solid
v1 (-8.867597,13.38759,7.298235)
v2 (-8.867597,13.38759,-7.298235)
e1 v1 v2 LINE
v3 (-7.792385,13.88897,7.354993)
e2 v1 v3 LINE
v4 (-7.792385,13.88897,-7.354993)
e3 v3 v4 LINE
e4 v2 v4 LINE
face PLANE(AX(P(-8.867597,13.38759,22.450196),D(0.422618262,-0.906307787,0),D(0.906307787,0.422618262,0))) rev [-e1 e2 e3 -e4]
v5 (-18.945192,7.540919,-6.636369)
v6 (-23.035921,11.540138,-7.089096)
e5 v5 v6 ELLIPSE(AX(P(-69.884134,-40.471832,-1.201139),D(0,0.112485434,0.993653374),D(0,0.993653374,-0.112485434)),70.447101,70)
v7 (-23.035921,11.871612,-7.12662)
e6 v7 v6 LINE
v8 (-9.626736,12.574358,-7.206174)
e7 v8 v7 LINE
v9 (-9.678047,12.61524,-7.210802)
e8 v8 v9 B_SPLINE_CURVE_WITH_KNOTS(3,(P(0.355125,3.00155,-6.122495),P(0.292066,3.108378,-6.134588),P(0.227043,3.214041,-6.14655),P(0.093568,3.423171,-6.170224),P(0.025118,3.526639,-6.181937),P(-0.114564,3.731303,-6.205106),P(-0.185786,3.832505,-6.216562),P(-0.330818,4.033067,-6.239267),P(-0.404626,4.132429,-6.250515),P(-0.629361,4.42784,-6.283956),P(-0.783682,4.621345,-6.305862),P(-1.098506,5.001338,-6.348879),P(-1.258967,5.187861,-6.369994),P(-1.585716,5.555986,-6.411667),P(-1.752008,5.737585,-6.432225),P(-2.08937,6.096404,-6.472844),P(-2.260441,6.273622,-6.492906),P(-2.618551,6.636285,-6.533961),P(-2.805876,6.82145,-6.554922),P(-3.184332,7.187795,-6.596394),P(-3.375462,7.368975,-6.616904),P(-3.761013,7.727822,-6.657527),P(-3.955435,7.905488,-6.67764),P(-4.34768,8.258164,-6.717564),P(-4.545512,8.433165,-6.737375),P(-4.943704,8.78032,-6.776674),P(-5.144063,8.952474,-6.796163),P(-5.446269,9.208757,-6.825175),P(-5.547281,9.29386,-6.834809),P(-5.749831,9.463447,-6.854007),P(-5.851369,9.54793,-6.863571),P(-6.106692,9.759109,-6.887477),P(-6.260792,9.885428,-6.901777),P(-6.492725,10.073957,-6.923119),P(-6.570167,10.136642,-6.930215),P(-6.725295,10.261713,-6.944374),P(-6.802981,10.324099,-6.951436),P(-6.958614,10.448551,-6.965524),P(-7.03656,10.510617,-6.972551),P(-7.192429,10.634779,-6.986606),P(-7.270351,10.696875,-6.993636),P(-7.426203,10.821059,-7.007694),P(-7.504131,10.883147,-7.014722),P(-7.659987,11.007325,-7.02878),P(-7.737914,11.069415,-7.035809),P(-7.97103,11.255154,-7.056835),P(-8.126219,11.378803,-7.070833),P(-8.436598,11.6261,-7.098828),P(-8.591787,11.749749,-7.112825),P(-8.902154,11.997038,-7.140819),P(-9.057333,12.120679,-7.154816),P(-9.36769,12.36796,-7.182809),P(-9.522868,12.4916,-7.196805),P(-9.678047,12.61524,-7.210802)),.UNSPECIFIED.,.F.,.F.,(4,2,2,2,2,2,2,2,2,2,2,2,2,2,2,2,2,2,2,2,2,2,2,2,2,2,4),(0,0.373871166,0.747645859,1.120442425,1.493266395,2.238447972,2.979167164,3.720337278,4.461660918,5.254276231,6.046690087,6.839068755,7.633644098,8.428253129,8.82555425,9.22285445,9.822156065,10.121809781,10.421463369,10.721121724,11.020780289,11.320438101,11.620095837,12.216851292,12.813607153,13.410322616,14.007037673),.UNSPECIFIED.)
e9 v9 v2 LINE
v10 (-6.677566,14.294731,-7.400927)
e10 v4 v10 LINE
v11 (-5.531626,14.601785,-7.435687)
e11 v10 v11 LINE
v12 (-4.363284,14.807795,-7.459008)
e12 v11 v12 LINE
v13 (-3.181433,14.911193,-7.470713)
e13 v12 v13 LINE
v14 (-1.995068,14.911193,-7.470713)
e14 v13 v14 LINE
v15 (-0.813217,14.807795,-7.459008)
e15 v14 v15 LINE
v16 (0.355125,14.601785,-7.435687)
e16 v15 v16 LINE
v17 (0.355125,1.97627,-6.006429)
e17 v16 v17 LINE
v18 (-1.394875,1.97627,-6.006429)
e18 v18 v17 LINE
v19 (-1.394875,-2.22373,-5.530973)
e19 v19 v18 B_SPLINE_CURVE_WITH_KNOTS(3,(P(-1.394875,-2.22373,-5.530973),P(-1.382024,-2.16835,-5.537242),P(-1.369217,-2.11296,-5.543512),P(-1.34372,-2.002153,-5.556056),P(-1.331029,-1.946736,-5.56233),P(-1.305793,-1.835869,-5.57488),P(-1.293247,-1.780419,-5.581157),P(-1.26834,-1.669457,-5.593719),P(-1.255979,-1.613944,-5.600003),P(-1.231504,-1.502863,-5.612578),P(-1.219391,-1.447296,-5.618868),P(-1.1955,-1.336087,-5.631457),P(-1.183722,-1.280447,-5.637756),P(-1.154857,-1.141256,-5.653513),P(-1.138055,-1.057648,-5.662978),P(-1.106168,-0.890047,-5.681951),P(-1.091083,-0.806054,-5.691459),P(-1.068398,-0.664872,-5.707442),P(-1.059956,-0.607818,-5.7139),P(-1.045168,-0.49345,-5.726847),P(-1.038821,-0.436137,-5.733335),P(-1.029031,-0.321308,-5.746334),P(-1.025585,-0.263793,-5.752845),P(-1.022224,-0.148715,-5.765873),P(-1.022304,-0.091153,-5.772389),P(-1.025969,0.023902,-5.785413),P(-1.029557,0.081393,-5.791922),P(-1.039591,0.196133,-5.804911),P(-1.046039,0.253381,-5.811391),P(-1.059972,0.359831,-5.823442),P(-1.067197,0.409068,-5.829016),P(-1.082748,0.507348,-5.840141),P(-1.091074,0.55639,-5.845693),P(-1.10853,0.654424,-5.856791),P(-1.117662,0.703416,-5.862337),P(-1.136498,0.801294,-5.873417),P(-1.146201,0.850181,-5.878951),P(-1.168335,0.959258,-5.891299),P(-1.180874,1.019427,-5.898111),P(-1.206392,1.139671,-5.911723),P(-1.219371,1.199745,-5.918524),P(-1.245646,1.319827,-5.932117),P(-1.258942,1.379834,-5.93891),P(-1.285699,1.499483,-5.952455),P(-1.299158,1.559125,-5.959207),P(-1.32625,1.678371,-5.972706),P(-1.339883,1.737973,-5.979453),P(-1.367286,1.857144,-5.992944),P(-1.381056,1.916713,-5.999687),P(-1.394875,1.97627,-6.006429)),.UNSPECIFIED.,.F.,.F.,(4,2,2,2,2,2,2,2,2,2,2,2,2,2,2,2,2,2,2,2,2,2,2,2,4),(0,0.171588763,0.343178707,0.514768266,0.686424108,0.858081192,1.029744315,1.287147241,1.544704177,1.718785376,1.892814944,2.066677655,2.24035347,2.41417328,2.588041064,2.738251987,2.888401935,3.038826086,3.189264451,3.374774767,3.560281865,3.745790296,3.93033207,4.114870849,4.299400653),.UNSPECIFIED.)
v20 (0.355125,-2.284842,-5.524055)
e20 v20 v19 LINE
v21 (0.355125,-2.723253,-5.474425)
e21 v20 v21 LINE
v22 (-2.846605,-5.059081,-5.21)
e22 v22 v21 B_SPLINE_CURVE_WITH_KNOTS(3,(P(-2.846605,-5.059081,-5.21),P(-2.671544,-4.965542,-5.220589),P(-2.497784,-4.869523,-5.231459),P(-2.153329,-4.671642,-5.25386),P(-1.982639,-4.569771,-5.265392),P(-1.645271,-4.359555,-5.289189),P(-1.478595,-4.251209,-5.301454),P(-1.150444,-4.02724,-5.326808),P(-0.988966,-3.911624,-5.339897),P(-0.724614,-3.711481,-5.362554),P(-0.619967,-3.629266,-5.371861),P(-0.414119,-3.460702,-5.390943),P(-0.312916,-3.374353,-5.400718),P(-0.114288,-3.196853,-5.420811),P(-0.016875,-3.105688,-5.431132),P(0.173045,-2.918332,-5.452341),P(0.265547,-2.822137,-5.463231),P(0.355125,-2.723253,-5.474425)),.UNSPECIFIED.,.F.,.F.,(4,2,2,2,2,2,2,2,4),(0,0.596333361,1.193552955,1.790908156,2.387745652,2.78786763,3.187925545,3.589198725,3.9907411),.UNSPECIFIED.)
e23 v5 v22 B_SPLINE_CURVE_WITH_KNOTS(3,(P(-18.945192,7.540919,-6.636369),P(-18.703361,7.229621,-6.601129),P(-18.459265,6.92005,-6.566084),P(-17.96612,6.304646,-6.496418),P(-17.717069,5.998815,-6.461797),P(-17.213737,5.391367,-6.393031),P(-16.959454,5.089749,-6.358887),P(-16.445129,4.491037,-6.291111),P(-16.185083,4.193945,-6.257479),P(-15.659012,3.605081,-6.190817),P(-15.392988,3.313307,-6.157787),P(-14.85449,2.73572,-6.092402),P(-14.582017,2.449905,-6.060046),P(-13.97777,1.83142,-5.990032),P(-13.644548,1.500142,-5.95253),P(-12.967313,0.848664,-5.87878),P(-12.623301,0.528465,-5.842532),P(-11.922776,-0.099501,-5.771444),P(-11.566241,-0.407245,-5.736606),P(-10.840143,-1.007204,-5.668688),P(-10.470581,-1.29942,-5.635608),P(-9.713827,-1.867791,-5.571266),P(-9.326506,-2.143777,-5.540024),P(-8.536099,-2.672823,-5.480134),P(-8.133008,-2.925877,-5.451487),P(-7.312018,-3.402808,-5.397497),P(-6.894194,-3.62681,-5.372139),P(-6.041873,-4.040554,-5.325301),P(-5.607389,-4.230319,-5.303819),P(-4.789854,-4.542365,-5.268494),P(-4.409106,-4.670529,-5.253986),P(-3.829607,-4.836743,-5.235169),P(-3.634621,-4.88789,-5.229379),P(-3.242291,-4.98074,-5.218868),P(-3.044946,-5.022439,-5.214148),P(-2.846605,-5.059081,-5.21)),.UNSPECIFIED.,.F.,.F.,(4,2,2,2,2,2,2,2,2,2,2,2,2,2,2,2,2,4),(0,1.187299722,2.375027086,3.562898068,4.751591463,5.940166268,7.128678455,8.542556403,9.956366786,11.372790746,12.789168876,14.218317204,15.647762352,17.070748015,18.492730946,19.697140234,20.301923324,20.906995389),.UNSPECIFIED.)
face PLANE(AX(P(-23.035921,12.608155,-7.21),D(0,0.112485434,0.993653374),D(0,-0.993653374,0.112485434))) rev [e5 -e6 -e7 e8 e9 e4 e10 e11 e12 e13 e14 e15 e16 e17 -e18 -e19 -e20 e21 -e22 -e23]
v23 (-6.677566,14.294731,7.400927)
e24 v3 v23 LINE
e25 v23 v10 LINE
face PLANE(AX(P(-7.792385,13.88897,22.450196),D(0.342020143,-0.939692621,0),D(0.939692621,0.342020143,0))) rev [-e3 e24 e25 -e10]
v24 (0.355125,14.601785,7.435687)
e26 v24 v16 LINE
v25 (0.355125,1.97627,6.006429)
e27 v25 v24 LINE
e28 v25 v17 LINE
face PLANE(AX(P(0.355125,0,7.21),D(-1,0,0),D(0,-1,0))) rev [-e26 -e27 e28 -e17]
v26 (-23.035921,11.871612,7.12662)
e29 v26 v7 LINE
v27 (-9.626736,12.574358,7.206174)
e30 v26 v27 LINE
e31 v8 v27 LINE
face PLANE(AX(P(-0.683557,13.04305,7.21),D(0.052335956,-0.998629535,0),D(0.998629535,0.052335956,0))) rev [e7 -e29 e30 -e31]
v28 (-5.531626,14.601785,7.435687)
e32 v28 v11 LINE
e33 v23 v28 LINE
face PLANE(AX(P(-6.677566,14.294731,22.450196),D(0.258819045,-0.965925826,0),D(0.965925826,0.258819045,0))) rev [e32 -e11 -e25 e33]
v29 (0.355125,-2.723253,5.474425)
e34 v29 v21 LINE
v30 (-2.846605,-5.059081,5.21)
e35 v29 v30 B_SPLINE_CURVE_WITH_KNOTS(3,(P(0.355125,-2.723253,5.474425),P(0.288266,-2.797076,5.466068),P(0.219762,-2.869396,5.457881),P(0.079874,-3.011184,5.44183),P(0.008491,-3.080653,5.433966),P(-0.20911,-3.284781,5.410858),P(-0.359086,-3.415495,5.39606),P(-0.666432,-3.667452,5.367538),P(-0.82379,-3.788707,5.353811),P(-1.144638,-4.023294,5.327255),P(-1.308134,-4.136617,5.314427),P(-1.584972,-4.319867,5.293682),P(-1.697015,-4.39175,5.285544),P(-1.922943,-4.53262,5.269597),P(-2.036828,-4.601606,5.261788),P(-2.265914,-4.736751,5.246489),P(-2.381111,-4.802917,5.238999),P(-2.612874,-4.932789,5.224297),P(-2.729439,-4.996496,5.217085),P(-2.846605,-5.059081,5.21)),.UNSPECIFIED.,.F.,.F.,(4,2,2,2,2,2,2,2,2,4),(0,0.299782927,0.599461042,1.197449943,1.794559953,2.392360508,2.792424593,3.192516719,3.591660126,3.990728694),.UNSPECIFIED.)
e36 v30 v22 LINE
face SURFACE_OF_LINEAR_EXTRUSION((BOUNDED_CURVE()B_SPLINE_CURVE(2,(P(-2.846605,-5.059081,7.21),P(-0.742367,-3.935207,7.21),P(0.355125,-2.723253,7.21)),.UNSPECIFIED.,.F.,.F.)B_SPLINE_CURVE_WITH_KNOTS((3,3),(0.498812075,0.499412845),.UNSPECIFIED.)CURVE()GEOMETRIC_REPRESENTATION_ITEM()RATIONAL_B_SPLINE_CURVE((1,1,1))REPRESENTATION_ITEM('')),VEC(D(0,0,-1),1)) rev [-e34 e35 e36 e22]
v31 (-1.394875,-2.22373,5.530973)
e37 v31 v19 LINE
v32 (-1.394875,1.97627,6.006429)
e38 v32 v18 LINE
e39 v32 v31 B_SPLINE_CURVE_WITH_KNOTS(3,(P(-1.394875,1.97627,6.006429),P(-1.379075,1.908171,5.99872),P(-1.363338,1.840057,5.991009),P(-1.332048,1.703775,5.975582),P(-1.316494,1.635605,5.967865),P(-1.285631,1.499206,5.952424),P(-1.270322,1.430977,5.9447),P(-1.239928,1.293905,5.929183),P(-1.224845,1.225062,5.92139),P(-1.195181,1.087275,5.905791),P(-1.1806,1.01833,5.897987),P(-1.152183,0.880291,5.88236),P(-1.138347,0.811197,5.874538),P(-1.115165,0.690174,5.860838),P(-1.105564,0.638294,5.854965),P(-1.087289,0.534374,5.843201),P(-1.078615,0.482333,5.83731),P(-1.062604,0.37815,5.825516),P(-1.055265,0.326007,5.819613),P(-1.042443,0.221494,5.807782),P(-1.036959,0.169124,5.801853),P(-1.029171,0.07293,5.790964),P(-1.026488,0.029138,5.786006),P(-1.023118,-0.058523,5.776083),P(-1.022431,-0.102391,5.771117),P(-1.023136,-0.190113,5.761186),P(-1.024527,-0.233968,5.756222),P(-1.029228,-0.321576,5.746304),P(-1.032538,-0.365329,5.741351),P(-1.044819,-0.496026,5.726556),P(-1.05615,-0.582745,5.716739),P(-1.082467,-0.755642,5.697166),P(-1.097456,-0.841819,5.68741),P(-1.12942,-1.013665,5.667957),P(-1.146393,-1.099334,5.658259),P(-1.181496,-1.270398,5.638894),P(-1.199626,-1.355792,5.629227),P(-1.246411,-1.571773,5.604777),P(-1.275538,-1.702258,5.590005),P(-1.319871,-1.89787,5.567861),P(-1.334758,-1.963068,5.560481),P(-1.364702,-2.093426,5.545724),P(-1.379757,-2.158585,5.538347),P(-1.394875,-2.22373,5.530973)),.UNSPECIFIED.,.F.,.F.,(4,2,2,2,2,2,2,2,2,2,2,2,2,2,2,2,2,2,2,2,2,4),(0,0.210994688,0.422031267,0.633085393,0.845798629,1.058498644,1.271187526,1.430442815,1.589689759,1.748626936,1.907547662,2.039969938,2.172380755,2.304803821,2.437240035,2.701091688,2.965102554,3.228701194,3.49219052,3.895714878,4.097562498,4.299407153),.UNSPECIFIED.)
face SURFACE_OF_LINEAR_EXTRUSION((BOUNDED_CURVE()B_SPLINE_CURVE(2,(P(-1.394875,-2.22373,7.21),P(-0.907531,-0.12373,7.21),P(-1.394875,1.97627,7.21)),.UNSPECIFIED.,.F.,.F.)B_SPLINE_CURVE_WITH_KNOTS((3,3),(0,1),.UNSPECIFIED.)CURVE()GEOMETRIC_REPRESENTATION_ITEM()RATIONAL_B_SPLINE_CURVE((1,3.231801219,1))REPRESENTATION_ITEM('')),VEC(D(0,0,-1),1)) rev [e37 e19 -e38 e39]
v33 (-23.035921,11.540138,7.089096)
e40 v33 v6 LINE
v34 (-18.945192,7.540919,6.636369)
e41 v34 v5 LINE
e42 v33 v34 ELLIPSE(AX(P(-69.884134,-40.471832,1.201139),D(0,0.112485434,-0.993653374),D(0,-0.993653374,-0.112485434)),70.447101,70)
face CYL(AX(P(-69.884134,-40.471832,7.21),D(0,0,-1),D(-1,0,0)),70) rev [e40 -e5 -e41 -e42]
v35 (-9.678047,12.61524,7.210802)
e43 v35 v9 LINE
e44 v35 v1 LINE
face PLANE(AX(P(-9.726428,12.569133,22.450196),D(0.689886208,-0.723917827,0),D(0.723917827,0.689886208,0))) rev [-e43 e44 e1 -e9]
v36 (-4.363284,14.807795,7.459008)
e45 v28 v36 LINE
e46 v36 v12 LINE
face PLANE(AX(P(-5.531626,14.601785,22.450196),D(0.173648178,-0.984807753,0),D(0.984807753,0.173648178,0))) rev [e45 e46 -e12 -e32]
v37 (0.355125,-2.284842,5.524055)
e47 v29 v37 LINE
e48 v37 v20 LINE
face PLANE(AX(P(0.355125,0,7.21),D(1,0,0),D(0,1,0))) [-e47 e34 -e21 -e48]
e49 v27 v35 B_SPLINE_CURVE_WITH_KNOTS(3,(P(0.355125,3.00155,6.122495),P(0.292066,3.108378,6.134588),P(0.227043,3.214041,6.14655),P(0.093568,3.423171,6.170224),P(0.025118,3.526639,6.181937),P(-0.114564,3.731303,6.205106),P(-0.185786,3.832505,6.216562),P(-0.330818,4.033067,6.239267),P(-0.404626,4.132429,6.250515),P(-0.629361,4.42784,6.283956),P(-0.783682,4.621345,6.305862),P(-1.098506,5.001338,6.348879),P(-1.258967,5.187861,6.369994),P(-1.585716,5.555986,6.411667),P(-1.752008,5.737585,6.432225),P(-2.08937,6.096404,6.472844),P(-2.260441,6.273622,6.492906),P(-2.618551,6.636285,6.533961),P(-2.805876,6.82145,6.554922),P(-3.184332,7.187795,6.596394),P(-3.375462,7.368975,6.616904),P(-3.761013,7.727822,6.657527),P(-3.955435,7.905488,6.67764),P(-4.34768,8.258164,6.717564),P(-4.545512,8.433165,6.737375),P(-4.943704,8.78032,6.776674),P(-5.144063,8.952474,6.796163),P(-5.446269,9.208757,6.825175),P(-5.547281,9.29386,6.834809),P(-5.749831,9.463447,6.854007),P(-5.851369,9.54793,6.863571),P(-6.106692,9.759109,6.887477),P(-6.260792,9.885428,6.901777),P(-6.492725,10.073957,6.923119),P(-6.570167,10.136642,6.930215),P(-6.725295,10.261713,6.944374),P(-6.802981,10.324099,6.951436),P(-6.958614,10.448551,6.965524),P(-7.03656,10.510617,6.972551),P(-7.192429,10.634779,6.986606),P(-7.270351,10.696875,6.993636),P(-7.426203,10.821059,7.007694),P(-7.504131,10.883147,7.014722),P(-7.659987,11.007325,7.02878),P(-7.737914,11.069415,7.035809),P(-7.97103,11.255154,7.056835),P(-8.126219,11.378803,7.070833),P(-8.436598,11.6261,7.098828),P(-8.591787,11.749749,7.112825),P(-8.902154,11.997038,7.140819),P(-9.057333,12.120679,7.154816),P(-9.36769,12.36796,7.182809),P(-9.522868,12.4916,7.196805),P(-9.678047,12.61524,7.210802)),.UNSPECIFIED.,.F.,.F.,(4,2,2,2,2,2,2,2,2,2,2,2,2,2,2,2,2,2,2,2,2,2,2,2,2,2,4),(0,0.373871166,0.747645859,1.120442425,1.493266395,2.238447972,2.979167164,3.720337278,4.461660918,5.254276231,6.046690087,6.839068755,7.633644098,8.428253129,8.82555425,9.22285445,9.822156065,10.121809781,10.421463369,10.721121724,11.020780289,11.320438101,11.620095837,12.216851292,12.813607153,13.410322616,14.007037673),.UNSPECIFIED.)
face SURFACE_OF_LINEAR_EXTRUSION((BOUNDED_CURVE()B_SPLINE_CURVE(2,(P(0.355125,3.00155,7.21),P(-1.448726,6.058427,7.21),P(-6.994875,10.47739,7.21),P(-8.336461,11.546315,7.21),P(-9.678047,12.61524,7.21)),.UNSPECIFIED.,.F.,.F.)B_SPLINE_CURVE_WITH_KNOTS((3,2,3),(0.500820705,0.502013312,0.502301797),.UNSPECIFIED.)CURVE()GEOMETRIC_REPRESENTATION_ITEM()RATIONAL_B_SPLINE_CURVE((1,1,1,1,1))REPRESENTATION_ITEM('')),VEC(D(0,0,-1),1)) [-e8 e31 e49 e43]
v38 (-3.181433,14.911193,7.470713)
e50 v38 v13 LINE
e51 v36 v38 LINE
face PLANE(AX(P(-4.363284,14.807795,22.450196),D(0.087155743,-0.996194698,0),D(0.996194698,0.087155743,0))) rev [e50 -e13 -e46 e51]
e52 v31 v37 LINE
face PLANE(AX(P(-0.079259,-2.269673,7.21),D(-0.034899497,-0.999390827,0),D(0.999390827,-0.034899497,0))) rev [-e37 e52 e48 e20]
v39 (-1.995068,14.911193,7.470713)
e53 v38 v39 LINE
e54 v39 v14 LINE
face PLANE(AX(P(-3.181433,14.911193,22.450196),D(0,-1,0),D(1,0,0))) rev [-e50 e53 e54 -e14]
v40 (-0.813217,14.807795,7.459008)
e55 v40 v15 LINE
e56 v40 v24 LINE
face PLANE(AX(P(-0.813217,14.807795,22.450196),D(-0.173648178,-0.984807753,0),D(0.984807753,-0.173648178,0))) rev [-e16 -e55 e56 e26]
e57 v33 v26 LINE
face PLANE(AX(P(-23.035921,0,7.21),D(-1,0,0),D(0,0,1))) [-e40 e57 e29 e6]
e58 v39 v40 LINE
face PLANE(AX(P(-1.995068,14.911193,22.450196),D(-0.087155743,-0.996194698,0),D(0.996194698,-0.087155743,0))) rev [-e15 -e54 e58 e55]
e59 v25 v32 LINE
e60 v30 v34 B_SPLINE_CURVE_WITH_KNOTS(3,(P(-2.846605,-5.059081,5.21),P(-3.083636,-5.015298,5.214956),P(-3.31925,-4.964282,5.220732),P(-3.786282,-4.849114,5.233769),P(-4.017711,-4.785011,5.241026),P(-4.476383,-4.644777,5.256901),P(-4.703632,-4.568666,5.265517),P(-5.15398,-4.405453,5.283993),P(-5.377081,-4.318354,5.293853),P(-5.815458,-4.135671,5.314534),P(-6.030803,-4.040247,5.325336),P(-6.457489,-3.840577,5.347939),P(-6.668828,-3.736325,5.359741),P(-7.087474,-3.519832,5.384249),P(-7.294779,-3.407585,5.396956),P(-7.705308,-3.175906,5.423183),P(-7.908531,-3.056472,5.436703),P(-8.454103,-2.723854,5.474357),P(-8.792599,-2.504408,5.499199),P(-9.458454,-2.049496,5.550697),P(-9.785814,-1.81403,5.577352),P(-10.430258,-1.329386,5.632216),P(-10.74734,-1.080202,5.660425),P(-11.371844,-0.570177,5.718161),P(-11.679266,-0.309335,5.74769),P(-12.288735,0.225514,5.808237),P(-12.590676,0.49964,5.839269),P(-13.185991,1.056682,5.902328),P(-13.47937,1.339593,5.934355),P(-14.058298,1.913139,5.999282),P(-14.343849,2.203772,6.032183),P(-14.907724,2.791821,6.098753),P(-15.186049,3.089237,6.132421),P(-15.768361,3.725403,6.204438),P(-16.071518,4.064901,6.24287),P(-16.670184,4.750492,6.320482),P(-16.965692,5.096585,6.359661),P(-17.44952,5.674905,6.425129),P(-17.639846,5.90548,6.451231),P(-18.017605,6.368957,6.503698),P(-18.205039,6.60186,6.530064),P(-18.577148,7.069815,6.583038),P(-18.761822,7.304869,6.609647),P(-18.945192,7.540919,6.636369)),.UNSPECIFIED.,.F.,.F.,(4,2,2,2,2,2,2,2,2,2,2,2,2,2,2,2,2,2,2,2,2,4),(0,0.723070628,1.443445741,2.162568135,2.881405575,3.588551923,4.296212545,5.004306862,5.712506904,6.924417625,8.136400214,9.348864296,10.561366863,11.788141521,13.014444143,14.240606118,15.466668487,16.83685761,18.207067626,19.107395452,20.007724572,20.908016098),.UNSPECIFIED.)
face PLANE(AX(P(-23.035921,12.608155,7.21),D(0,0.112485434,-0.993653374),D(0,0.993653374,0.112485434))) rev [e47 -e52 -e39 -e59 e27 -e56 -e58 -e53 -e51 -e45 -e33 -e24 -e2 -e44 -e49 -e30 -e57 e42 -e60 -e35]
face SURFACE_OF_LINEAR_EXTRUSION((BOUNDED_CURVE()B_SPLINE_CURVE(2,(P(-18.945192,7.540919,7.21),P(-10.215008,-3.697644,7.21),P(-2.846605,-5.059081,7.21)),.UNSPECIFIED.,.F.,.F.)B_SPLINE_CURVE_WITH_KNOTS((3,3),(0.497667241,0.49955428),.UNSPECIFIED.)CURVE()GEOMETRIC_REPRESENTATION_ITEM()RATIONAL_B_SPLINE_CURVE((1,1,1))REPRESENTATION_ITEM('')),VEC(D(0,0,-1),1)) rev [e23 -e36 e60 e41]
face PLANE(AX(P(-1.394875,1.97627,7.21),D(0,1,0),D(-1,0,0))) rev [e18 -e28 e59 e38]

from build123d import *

# Parameters (mm, degrees)
SALIENTE_EXTRUIR1_DEPTH      = 7.21
SALIENTE_EXTRUIR2_DEPTH      = 7.21
SALIENTE_EXTRUIR2_DEPTH_BACK = 7.21
CORTAR_EXTRUIR2_DEPTH        = 28.232395202
CORTAR_EXTRUIR2_DEPTH_BACK   = 28.232395202
SALIENTE_EXTRUIR3_START      = -5.2099999
SALIENTE_EXTRUIR3_DEPTH      = 10.4199998
SALIENTE_EXTRUIR3_START_2    = -7.470713012
SALIENTE_EXTRUIR3_2_DEPTH    = 14.941425924
SALIENTE_EXTRUIR3_START_3    = -23.035921246
SALIENTE_EXTRUIR3_3_DEPTH    = 24.035921246


with BuildPart() as part:
    # Croquis1 → Saliente-Extruir1 (new, symmetric)
    with BuildSketch(Plane.XY):
        with BuildLine():
            add(Edge.make_bspline(
                [(-18.945192114, 7.540918896), (-10.215008384, -3.697644103), (-2.846604825, -5.059081104)],
                knots=[0.497667241, 0.497667241, 0.497667241, 0.49955428, 0.49955428, 0.49955428], degree=2, weights=[1, 1, 1]))
            add(Edge.make_bspline(
                [(-2.846604825, -5.059081104), (-0.742366882, -3.9352066), (0.355125, -2.723253227)],
                knots=[0.498812075, 0.498812075, 0.498812075, 0.499412845, 0.499412845, 0.499412845], degree=2, weights=[1, 1, 1]))
            Line((0.355125, -2.723253227), (0.355125, -2.284841781))
            Line((0.355125, -2.284841781), (-1.394875, -2.223730435))
            add(Edge.make_bspline(
                [(-1.394875, -2.223730435), (-0.90753067, -0.123730435), (-1.394875, 1.976269565)],
                knots=[0, 0, 0, 1, 1, 1], degree=2, weights=[1, 3.231801219, 1]))
            Line((-1.394875, 1.976269565), (0.355125, 2.284841781))
            Line((0.355125, 2.284841781), (0.355125, 3.001549529))
            add(Edge.make_bspline(
                [(0.355125, 3.001549529), (-1.44872627, 6.058427314), (-6.994875026, 10.477389992)],
                knots=[0.500820705, 0.500820705, 0.500820705, 0.502013312, 0.502013312, 0.502013312], degree=2, weights=[1, 1, 1]))
            Line((-6.994875026, 10.477389992), (-8.981845695, 12.608155172))
            Line((-8.981845695, 12.608155172), (-23.035921146, 11.871612288))
            Line((-23.035921146, 11.871612288), (-23.035921146, 11.54013782))
            ThreePointArc((-23.035921146, 11.54013782), (-20.949684518, 9.582335705), (-18.945192114, 7.540918896))
        make_face()
    extrude(amount=SALIENTE_EXTRUIR1_DEPTH, both=True)

    # Croquis4 → Saliente-Extruir2 (add, two sides: drawn at the far end of the back side and taken through both)
    with BuildSketch(Plane.XY.offset(-SALIENTE_EXTRUIR2_DEPTH_BACK)):
        Polygon((-1.394875, 1.976269565), (0.355125, 2.284841781), (0.355125, 1.976269565), align=None)
    extrude(amount=SALIENTE_EXTRUIR2_DEPTH + SALIENTE_EXTRUIR2_DEPTH_BACK)

    # Croquis6 → Cortar-Extruir2 (cut, two sides: drawn at the far end of the back side and taken through both)
    with BuildSketch(Plane(origin=(0, 0, 0), x_dir=(0, 0, -1), z_dir=(1, 0, 0)).offset(-CORTAR_EXTRUIR2_DEPTH_BACK)):
        Polygon((7.21, 12.608155172), (7.21, -5.059081104), (5.21, -5.059081104), align=None)
        Polygon((-7.21, 12.608155172), (-7.21, -5.059081104), (-5.21, -5.059081104), align=None)
    extrude(amount=CORTAR_EXTRUIR2_DEPTH + CORTAR_EXTRUIR2_DEPTH_BACK, mode=Mode.SUBTRACT)

    # Saliente-Extruir3: read off the stored shape, not the designer's step
    # Saliente-Extruir3 outline → Saliente-Extruir3 (add)
    with BuildSketch(Plane.XY.offset(SALIENTE_EXTRUIR3_START)):
        with BuildLine():
            add(Edge.make_bspline(
                [(-9.626736117, 12.574357897), (-9.652391468, 12.594799115), (-9.678046818, 12.615240333)],
                knots=[0.502296281, 0.502296281, 0.502296281, 0.502301797, 0.502301797, 0.502301797], degree=2))
            Line((-9.626736117, 12.574357897), (-8.981845695, 12.608155172))
            Line((-8.981845695, 12.608155172), (-6.994875026, 10.477389992))
            add(Edge.make_bspline(
                [(0.355125, 3.001549529), (-1.44872627, 6.058427314), (-6.994875026, 10.477389992)],
                knots=[0.500820705, 0.500820705, 0.500820705, 0.502013312, 0.502013312, 0.502013312], degree=2))
            Line((0.355125, 3.001549529), (0.355125, 14.601784752))
            Line((0.355125, 14.601784752), (-0.813216768, 14.807794929))
            Line((-0.813216768, 14.807794929), (-1.995067613, 14.91119348))
            Line((-1.995067613, 14.91119348), (-3.181432936, 14.91119348))
            Line((-3.181432936, 14.91119348), (-4.363283782, 14.807794929))
            Line((-4.363283782, 14.807794929), (-5.53162555, 14.601784752))
            Line((-5.53162555, 14.601784752), (-6.677566455, 14.294730812))
            Line((-6.677566455, 14.294730812), (-7.792385195, 13.888969974))
            Line((-7.792385195, 13.888969974), (-8.867597325, 13.387590324))
            Line((-8.867597325, 13.387590324), (-9.678046818, 12.615240333))
        make_face()
    extrude(amount=SALIENTE_EXTRUIR3_DEPTH)

    # Saliente-Extruir3 2 outline → Saliente-Extruir3 2 (add)
    with BuildSketch(Plane.XY.offset(SALIENTE_EXTRUIR3_START_2)):
        with BuildLine():
            add(Edge.make_bspline(
                [(-9.626736117, 12.574357897), (-9.652391468, 12.594799115), (-9.678046818, 12.615240333)],
                knots=[0.502296281, 0.502296281, 0.502296281, 0.502301797, 0.502301797, 0.502301797], degree=2))
            Line((-9.626736117, 12.574357897), (-8.981845695, 12.608155172))
            Line((-8.981845695, 12.608155172), (-6.994875026, 10.477389992))
            add(Edge.make_bspline(
                [(0.355125, 3.001549529), (-1.44872627, 6.058427314), (-6.994875026, 10.477389992)],
                knots=[0.500820705, 0.500820705, 0.500820705, 0.502013312, 0.502013312, 0.502013312], degree=2))
            Line((0.355125, 3.001549529), (0.355125, 14.601784752))
            Line((0.355125, 14.601784752), (-0.813216768, 14.807794929))
            Line((-0.813216768, 14.807794929), (-1.995067613, 14.91119348))
            Line((-1.995067613, 14.91119348), (-3.181432936, 14.91119348))
            Line((-3.181432936, 14.91119348), (-4.363283782, 14.807794929))
            Line((-4.363283782, 14.807794929), (-5.53162555, 14.601784752))
            Line((-5.53162555, 14.601784752), (-6.677566455, 14.294730812))
            Line((-6.677566455, 14.294730812), (-7.792385195, 13.888969974))
            Line((-7.792385195, 13.888969974), (-8.867597325, 13.387590324))
            Line((-8.867597325, 13.387590324), (-9.678046818, 12.615240333))
        make_face()
    extrude(amount=SALIENTE_EXTRUIR3_2_DEPTH)

    # Saliente-Extruir3 3 outline → Saliente-Extruir3 3 (cut)
    with BuildSketch(Plane.YZ.offset(SALIENTE_EXTRUIR3_START_3)):
        Polygon((2, 7.470712912), (2, 6.009115492), (14.91119348, 7.470712912), align=None)
        Polygon((14.91119348, -7.470712912), (2, -6.009115492), (2, -7.470713012), align=None)
    extrude(amount=SALIENTE_EXTRUIR3_3_DEPTH, mode=Mode.SUBTRACT)


solid = part.part
